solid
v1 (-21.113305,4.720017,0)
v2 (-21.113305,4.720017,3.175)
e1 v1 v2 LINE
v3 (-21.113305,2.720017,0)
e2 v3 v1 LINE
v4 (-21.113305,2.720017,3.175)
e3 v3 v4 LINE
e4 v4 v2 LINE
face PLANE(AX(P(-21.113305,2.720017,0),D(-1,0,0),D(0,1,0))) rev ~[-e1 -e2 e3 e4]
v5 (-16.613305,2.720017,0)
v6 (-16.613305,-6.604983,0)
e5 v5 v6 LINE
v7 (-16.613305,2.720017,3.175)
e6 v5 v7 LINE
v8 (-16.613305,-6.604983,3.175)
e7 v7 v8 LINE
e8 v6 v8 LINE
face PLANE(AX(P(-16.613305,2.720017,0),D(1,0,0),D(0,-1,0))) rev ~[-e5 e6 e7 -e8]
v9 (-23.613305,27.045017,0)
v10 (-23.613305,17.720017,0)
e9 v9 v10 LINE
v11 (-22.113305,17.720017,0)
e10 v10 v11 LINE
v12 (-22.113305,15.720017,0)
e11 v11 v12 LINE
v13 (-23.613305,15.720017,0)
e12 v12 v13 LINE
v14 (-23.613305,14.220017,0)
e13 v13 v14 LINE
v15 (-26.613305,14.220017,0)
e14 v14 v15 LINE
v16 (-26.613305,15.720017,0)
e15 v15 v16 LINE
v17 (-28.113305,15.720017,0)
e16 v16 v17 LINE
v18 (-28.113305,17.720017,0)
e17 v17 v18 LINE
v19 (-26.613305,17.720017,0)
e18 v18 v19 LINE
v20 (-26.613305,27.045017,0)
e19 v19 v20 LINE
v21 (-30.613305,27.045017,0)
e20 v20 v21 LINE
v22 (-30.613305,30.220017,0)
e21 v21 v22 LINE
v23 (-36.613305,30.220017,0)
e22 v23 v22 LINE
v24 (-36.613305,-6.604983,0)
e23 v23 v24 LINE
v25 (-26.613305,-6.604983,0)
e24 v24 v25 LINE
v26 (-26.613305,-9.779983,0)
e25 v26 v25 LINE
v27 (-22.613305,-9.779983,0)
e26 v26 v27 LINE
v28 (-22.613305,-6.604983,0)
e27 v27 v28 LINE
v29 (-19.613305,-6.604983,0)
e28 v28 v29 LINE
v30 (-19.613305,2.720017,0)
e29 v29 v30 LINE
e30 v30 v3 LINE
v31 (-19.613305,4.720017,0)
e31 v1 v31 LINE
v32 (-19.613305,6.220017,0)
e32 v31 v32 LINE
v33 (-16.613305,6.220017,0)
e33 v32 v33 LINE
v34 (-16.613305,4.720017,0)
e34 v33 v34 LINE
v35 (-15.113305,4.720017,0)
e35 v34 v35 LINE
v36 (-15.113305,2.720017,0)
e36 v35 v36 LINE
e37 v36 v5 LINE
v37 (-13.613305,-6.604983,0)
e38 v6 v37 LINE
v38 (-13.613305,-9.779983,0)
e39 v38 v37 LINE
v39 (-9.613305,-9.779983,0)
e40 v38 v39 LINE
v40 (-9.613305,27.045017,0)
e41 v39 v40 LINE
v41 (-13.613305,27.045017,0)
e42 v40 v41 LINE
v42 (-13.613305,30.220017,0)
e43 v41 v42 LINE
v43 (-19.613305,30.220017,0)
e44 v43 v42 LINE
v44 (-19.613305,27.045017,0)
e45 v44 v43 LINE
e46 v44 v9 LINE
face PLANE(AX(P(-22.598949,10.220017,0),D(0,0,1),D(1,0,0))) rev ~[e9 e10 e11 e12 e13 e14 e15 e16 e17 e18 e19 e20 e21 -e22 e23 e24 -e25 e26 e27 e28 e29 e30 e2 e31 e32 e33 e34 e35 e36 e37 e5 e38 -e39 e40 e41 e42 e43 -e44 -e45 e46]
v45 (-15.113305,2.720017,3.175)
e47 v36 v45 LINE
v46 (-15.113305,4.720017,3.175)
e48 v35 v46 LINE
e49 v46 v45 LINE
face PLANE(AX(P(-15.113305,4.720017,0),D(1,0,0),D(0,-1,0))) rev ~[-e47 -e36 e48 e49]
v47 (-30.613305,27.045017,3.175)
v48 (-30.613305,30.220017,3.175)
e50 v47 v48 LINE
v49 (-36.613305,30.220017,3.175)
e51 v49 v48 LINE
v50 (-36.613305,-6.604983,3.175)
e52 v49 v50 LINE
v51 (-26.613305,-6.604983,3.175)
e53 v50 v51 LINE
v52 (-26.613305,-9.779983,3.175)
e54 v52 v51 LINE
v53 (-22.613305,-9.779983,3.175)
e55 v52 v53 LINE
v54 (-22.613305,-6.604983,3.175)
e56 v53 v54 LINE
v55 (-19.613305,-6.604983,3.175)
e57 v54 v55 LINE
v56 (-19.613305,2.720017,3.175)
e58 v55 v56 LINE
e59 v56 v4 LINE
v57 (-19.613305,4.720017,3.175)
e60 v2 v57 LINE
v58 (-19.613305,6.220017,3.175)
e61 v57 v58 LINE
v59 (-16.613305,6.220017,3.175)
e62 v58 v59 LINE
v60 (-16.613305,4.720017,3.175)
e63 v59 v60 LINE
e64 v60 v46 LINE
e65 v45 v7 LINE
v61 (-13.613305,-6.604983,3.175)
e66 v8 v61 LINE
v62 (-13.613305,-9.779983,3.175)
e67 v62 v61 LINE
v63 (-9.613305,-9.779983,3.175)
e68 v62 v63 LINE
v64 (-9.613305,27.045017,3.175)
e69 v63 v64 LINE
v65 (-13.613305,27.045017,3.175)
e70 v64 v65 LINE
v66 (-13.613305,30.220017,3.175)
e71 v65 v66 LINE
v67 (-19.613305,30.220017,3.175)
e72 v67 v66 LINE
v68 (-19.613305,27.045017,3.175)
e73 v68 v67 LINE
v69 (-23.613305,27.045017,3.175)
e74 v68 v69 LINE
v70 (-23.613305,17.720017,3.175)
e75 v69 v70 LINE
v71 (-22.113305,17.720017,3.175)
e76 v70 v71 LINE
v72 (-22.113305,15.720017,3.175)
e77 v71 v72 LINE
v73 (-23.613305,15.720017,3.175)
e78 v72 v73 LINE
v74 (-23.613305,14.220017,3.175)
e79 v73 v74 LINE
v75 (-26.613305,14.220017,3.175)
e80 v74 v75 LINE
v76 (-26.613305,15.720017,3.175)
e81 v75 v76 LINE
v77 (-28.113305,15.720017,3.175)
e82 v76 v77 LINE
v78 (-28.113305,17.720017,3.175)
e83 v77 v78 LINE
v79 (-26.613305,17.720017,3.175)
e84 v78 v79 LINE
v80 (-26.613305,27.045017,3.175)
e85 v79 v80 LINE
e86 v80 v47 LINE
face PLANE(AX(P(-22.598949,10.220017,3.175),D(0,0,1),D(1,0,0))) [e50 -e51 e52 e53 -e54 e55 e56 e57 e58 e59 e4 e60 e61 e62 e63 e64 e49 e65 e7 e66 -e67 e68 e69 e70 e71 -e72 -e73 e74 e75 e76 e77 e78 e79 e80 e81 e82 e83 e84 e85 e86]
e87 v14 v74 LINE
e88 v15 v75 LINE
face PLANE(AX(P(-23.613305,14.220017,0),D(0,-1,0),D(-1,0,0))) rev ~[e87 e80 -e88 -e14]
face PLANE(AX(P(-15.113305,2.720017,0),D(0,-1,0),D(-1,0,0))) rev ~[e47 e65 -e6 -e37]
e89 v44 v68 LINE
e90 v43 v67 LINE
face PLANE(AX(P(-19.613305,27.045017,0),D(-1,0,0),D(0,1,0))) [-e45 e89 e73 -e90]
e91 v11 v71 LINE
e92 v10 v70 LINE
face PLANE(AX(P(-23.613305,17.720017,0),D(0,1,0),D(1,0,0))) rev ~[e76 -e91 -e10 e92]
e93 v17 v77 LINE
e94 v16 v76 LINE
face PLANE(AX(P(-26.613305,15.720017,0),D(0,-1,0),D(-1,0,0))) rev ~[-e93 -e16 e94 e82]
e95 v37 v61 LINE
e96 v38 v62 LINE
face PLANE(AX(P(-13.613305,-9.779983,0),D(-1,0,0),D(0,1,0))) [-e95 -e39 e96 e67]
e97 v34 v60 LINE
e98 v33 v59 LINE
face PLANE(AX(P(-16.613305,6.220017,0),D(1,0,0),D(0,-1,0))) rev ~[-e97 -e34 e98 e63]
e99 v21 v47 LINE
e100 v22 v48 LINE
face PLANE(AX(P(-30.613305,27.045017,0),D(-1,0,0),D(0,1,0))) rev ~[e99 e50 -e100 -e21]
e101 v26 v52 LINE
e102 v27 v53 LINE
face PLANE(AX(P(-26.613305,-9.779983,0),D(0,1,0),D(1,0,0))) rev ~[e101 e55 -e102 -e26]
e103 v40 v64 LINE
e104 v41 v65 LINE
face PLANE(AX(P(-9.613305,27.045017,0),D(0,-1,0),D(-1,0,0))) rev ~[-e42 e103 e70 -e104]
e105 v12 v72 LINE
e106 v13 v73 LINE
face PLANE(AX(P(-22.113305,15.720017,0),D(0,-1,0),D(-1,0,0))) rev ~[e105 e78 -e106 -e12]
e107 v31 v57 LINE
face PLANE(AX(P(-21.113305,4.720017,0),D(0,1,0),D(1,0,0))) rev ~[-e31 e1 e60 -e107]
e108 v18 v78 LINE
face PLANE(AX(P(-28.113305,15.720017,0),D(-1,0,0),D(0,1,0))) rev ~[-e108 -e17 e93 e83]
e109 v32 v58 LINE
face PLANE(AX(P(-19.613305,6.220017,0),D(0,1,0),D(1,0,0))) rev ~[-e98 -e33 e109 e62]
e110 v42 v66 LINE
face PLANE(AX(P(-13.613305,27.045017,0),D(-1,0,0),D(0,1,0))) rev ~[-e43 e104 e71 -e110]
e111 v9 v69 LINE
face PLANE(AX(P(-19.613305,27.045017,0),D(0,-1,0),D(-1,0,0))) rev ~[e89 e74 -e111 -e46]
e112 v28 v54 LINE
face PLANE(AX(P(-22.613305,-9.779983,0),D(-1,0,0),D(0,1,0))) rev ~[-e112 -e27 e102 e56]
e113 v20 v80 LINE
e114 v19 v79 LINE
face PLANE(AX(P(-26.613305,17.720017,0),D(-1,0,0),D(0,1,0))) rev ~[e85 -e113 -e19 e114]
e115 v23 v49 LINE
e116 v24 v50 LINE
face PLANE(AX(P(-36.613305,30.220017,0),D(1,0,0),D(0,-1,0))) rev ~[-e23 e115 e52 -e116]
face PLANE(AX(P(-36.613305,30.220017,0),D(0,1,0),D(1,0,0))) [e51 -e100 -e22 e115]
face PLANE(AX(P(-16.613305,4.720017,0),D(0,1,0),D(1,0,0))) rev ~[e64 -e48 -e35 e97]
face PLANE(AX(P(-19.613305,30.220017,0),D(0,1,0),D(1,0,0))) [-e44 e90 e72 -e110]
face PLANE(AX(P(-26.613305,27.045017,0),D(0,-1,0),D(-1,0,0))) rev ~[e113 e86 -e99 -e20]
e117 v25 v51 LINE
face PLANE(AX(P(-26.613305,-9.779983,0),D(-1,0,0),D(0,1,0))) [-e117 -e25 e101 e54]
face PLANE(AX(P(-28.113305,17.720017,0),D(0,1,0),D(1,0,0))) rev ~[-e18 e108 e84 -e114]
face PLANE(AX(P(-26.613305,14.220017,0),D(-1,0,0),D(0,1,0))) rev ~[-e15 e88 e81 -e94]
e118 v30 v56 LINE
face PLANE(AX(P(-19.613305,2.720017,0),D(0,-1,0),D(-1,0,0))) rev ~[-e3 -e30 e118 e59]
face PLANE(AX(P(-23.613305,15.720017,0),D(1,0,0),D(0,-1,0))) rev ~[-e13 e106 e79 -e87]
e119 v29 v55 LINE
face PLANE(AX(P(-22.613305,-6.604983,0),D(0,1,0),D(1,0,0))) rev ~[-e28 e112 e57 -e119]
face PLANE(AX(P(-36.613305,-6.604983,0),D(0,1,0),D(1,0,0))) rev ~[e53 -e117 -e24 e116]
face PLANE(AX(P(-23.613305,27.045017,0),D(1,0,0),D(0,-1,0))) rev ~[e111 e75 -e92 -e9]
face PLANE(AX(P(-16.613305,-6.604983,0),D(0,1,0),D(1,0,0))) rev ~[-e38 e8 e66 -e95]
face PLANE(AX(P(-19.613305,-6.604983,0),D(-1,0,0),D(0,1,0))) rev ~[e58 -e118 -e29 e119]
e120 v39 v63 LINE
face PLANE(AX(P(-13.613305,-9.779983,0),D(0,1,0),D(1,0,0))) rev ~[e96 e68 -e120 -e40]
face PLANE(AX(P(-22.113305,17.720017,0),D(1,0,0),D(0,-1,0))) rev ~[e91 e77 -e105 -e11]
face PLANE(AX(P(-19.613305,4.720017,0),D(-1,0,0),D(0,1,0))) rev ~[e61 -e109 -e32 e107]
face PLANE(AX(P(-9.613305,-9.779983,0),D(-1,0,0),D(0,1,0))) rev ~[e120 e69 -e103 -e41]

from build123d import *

# Parameters (mm, degrees)
F0_W     = 6
F0_H     = 3.175
F0_W_2   = 4
F1_DEPTH = 3.175


# Not quite as in the source:
# - a length typed as a fraction of an inch, garbled in the dataset ("3 / 203.2 mm" for 3/8 in), is restored


with BuildPart() as f1:
    # F0 (on Top) → F1 (new body)
    with BuildSketch(Plane.XY):
        Polygon((-26.613304615, 17.7200174183), (-26.613304615, 27.0450174183), (-30.613304615, 27.0450174183), (-36.613304615, 27.0450174183), (-36.613304615, -6.6049825817), (-26.613304615, -6.6049825817), (-22.613304615, -6.6049825817), (-19.613304615, -6.6049825817), (-19.613304615, 2.7200174183), (-21.113304615, 2.7200174183), (-21.113304615, 4.7200174183), (-19.613304615, 4.7200174183), (-19.613304615, 6.2200174183), (-16.613304615, 6.2200174183), (-16.613304615, 4.7200174183), (-15.113304615, 4.7200174183), (-15.113304615, 2.7200174183), (-16.613304615, 2.7200174183), (-16.613304615, -6.6049825817), (-13.613304615, -6.6049825817), (-9.613304615, -6.6049825817), (-9.613304615, 27.0450174183), (-13.613304615, 27.0450174183), (-19.613304615, 27.0450174183), (-23.613304615, 27.0450174183), (-23.613304615, 17.7200174183), (-22.113304615, 17.7200174183), (-22.113304615, 15.7200174183), (-23.613304615, 15.7200174183), (-23.613304615, 14.2200174183), (-26.613304615, 14.2200174183), (-26.613304615, 15.7200174183), (-28.113304615, 15.7200174183), (-28.113304615, 17.7200174183), align=None)
        with Locations((-33.613304615, 28.6325174183)):
            Rectangle(F0_W, F0_H)
        with Locations((-16.613304615, 28.6325174183)):
            Rectangle(F0_W, F0_H)
        with Locations((-24.613304615, -8.1924825817)):
            Rectangle(F0_W_2, F0_H)
        with Locations((-11.613304615, -8.1924825817)):
            Rectangle(F0_W_2, F0_H)
    extrude(amount=F1_DEPTH)


solid = f1.part
